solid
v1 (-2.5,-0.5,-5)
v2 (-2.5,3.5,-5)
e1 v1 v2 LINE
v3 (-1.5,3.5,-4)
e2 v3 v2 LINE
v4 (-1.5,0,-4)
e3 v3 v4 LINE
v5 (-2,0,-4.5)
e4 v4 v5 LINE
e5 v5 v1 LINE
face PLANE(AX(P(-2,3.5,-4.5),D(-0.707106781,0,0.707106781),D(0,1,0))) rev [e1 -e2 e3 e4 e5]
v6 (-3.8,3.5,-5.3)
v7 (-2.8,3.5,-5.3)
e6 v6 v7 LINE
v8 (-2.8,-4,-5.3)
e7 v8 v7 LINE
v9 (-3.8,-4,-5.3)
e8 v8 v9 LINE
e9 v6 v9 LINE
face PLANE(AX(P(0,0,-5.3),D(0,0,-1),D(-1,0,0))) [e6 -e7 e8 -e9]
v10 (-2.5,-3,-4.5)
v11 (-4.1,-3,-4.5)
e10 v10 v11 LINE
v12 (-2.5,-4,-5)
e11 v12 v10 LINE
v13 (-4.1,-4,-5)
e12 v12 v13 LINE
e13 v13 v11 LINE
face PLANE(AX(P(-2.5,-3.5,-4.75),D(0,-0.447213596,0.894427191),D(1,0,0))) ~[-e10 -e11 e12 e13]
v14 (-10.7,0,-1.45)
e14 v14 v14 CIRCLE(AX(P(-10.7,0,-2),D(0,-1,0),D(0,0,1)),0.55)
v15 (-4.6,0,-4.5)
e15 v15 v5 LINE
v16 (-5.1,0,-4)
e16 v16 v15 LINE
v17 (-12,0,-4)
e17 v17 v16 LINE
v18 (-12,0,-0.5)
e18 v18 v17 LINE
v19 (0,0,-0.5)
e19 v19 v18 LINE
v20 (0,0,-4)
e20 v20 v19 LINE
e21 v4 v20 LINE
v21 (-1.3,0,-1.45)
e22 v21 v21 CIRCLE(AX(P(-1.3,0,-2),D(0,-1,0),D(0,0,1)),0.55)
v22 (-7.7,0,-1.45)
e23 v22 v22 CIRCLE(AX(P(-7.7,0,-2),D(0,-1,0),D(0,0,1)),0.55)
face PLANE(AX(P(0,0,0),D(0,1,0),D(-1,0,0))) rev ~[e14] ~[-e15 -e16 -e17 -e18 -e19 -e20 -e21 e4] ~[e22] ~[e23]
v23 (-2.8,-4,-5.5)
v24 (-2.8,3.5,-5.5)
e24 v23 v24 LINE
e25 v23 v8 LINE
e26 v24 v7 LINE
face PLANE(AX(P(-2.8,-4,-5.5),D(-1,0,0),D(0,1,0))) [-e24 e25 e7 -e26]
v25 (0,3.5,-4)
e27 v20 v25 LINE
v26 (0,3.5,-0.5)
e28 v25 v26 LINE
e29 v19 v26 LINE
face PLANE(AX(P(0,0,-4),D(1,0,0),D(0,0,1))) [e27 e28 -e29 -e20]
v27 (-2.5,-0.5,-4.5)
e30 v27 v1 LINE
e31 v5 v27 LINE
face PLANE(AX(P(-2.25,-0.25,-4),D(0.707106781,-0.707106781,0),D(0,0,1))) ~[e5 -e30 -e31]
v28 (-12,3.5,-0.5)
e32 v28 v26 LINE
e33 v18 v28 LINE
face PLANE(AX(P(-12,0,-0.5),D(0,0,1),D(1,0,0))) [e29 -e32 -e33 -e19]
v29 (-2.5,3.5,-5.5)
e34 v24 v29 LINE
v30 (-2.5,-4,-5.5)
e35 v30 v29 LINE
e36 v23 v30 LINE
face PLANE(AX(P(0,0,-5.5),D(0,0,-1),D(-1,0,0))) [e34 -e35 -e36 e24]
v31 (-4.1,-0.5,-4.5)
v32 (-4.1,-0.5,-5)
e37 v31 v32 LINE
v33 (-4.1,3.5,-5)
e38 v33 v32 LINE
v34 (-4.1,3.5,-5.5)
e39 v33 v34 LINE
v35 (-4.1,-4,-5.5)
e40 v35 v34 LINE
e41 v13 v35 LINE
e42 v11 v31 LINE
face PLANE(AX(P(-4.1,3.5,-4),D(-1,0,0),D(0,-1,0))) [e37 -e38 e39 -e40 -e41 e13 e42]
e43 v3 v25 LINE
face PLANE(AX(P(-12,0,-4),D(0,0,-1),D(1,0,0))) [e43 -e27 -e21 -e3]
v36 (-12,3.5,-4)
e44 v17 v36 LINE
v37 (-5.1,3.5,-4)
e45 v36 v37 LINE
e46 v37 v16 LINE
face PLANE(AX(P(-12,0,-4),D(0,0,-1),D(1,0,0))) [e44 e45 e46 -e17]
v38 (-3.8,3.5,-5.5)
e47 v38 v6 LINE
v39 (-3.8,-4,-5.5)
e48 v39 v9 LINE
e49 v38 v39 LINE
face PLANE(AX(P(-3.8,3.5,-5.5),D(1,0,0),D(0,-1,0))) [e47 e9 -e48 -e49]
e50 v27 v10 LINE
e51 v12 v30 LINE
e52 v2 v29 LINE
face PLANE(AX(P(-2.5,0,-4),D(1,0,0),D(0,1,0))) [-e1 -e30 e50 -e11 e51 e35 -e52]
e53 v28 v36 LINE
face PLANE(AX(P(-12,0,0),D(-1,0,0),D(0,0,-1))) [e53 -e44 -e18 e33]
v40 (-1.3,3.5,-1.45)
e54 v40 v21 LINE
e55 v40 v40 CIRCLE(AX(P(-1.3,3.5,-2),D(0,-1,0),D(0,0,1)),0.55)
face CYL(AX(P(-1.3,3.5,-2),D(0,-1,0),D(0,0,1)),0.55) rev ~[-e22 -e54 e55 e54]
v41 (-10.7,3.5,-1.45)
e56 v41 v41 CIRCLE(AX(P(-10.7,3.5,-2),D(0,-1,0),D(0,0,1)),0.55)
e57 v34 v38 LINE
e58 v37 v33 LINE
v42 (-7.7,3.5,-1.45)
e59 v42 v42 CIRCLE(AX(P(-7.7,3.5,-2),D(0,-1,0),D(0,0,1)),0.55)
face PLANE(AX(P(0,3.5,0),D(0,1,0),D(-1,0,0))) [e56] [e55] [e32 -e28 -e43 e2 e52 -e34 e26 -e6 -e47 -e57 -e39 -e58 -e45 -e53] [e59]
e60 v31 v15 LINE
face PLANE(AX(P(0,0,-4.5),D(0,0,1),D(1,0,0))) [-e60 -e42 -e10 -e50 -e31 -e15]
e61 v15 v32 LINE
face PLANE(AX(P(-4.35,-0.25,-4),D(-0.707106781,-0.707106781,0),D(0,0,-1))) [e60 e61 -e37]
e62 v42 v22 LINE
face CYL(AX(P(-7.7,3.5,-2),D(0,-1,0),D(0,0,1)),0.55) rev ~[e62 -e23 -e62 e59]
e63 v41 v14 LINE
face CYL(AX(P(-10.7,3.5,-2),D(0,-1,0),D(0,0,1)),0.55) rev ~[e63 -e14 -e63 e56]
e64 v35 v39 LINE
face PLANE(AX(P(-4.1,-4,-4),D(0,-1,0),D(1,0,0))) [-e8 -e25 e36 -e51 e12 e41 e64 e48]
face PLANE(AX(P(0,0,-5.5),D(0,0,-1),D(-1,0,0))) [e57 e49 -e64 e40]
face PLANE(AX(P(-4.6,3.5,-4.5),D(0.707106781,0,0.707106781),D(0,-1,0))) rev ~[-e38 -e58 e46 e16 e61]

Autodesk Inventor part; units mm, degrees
ref_plane "YZ Plane" through (0, 0, 0) normal (1, 0, 0) x (0, 1, 0)
ref_plane "XZ Plane" through (0, 0, 0) normal (0, 1, 0) x (-1, 0, 0)
ref_plane "XY Plane" through (0, 0, 0) normal (0, 0, 1) x (1, 0, 0)
sketch "스케치1" plane through (0, 0, 0) normal (0, 1, 0) x (-1, 0, 0)
  line L0 (0, 0) -> (12, 0)
  line L1 (12, 0) -> (12, -4)
  line L2 (12, -4) -> (0, -4)
  line L3 (0, -4) -> (0, 0)
  dimension "d0" = 12
  dimension "d1" = 4
extrude "돌출1" add sketch "스케치1" along normal blind 3.5
sketch "스케치2" plane through (0, 3.5, 0) normal (0, 1, 0) x (1, 0, 0)
  line L0 (0, 0) -> (0, 4) construction
  line L1 (0, 2) -> (-12, 2) construction
  line L2 (-12, 4) -> (-12, 0) construction
  point P0 (-1.3, 2)
  point P1 (-7.7, 2)
  point P2 (-10.7, 2)
  dimension "d59" = 1.3
  dimension "d60" = 3
  dimension "d62" = 1.3
hole "구멍1" at (-10.7, 3.5, -2) at (-1.3, 3.5, -2) direction (0, -1, 0) diameter 1.1 end through all
hole "구멍2" at (-7.7, 3.5, -2) direction (0, -1, 0) diameter 1.1 end through all
sketch "스케치11" plane through (0, 0, -4) normal (0, 0, -1) x (-1, 0, 0)
  line L0 (0, 0) -> (12, 0) projected
  line L1 (0, 0) -> (0, 3.5) projected
  line L2 (12, 3.5) -> (0, 3.5) projected
  line L3 (12, 0) -> (12, 3.5) projected
  line L4 (12, 3.5) -> (0, 3.5) projected
  line L5 (2.5, 3.5) -> (4.1, 3.5)
  line L6 (4.1, 3.5) -> (4.1, -4)
  line L7 (4.1, -4) -> (2.5, -4)
  line L8 (2.5, -4) -> (2.5, 3.5)
  dimension "d99" = 1.6
  dimension "d100" = 4
  dimension "d124" = 2.5
extrude "돌출9" add sketch "스케치11" along normal blind 1.5 contours L8 L2 L6 L0 | L0 L6 L7 L8
chamfer "모따기6" distance 1 angle 45 2 edges at (-2.5, 1.75, -4) (-4.1, 1.75, -4)
chamfer "모따기7" distance 0.5 angle 45 2 edges at (-2.5, 0, -4.5) (-4.1, 0, -4.5)
sketch "스케치12" plane through (0, 0, -5.5) normal (0, 0, -1) x (-1, 0, 0)
  line L0 (4.1, 3.5) -> (2.5, 3.5) projected
  line L1 (2.5, 3.5) -> (2.5, -4) projected
  line L2 (2.5, -4) -> (4.1, -4) projected
  line L3 (4.1, -4) -> (4.1, 3.5) projected
  line L4 (2.8, -4) -> (2.8, 3.5)
  line L5 (12, 3.5) -> (0, 3.5) projected
  line L6 (3.8, 3.5) -> (3.8, -4)
  line L7 (2.5, -4) -> (4.1, -4) projected
  point P0 (0, 0)
  point P1 (3.8, -4)
  dimension "d110" = 1
  dimension "d111" = 0.3
  dimension "d112" = 0.3
extrude "돌출10" cut sketch "스케치12" against normal blind 0.2 contours L6 L2 L4 L0
sketch "스케치13" plane through (0, 0, -4) normal (0, 0, 1) x (1, 0, 0)
  line L0 (-4.6, 0) -> (-2, 0) projected
  line L1 (-4.1, -0.5) -> (-4.6, 0) projected
  line L2 (-4.1, -4) -> (-4.1, -0.5) projected
  line L3 (-2.5, -4) -> (-4.1, -4) projected
  line L4 (-2.5, -0.5) -> (-2.5, -4) projected
  line L5 (-2, 0) -> (-2.5, -0.5) projected
  point P0 (0, 0)
extrude "돌출11" cut sketch "스케치13" against normal blind 0.5
chamfer "모따기8" distance 0.5 distance2 1 1 edges at (-3.3, -4, -4.5) measured on face at (-3.1333, -4, -4.7667)
sketch "스케치14" plane through (-12, 0, 0) normal (0, 0, 1) x (1, 0, 0)
  line L0 (12, 0) -> (0, 0) projected
  line L1 (12, 0) -> (12, 3.5) projected
  line L2 (0, 3.5) -> (12, 3.5) projected
  line L3 (0, 0) -> (0, 3.5) projected
extrude "돌출12" cut sketch "스케치14" against normal blind 0.5
equation "\"d111\" = d112"
equation "\"G23_F\" = 0.65"
equation "\"G23_M\" = 0.67"
equation "\"Screw_F\" = 1.3"
equation "\"Screw_M\" = 1.6"
properties part number "_3D 인쇄"
